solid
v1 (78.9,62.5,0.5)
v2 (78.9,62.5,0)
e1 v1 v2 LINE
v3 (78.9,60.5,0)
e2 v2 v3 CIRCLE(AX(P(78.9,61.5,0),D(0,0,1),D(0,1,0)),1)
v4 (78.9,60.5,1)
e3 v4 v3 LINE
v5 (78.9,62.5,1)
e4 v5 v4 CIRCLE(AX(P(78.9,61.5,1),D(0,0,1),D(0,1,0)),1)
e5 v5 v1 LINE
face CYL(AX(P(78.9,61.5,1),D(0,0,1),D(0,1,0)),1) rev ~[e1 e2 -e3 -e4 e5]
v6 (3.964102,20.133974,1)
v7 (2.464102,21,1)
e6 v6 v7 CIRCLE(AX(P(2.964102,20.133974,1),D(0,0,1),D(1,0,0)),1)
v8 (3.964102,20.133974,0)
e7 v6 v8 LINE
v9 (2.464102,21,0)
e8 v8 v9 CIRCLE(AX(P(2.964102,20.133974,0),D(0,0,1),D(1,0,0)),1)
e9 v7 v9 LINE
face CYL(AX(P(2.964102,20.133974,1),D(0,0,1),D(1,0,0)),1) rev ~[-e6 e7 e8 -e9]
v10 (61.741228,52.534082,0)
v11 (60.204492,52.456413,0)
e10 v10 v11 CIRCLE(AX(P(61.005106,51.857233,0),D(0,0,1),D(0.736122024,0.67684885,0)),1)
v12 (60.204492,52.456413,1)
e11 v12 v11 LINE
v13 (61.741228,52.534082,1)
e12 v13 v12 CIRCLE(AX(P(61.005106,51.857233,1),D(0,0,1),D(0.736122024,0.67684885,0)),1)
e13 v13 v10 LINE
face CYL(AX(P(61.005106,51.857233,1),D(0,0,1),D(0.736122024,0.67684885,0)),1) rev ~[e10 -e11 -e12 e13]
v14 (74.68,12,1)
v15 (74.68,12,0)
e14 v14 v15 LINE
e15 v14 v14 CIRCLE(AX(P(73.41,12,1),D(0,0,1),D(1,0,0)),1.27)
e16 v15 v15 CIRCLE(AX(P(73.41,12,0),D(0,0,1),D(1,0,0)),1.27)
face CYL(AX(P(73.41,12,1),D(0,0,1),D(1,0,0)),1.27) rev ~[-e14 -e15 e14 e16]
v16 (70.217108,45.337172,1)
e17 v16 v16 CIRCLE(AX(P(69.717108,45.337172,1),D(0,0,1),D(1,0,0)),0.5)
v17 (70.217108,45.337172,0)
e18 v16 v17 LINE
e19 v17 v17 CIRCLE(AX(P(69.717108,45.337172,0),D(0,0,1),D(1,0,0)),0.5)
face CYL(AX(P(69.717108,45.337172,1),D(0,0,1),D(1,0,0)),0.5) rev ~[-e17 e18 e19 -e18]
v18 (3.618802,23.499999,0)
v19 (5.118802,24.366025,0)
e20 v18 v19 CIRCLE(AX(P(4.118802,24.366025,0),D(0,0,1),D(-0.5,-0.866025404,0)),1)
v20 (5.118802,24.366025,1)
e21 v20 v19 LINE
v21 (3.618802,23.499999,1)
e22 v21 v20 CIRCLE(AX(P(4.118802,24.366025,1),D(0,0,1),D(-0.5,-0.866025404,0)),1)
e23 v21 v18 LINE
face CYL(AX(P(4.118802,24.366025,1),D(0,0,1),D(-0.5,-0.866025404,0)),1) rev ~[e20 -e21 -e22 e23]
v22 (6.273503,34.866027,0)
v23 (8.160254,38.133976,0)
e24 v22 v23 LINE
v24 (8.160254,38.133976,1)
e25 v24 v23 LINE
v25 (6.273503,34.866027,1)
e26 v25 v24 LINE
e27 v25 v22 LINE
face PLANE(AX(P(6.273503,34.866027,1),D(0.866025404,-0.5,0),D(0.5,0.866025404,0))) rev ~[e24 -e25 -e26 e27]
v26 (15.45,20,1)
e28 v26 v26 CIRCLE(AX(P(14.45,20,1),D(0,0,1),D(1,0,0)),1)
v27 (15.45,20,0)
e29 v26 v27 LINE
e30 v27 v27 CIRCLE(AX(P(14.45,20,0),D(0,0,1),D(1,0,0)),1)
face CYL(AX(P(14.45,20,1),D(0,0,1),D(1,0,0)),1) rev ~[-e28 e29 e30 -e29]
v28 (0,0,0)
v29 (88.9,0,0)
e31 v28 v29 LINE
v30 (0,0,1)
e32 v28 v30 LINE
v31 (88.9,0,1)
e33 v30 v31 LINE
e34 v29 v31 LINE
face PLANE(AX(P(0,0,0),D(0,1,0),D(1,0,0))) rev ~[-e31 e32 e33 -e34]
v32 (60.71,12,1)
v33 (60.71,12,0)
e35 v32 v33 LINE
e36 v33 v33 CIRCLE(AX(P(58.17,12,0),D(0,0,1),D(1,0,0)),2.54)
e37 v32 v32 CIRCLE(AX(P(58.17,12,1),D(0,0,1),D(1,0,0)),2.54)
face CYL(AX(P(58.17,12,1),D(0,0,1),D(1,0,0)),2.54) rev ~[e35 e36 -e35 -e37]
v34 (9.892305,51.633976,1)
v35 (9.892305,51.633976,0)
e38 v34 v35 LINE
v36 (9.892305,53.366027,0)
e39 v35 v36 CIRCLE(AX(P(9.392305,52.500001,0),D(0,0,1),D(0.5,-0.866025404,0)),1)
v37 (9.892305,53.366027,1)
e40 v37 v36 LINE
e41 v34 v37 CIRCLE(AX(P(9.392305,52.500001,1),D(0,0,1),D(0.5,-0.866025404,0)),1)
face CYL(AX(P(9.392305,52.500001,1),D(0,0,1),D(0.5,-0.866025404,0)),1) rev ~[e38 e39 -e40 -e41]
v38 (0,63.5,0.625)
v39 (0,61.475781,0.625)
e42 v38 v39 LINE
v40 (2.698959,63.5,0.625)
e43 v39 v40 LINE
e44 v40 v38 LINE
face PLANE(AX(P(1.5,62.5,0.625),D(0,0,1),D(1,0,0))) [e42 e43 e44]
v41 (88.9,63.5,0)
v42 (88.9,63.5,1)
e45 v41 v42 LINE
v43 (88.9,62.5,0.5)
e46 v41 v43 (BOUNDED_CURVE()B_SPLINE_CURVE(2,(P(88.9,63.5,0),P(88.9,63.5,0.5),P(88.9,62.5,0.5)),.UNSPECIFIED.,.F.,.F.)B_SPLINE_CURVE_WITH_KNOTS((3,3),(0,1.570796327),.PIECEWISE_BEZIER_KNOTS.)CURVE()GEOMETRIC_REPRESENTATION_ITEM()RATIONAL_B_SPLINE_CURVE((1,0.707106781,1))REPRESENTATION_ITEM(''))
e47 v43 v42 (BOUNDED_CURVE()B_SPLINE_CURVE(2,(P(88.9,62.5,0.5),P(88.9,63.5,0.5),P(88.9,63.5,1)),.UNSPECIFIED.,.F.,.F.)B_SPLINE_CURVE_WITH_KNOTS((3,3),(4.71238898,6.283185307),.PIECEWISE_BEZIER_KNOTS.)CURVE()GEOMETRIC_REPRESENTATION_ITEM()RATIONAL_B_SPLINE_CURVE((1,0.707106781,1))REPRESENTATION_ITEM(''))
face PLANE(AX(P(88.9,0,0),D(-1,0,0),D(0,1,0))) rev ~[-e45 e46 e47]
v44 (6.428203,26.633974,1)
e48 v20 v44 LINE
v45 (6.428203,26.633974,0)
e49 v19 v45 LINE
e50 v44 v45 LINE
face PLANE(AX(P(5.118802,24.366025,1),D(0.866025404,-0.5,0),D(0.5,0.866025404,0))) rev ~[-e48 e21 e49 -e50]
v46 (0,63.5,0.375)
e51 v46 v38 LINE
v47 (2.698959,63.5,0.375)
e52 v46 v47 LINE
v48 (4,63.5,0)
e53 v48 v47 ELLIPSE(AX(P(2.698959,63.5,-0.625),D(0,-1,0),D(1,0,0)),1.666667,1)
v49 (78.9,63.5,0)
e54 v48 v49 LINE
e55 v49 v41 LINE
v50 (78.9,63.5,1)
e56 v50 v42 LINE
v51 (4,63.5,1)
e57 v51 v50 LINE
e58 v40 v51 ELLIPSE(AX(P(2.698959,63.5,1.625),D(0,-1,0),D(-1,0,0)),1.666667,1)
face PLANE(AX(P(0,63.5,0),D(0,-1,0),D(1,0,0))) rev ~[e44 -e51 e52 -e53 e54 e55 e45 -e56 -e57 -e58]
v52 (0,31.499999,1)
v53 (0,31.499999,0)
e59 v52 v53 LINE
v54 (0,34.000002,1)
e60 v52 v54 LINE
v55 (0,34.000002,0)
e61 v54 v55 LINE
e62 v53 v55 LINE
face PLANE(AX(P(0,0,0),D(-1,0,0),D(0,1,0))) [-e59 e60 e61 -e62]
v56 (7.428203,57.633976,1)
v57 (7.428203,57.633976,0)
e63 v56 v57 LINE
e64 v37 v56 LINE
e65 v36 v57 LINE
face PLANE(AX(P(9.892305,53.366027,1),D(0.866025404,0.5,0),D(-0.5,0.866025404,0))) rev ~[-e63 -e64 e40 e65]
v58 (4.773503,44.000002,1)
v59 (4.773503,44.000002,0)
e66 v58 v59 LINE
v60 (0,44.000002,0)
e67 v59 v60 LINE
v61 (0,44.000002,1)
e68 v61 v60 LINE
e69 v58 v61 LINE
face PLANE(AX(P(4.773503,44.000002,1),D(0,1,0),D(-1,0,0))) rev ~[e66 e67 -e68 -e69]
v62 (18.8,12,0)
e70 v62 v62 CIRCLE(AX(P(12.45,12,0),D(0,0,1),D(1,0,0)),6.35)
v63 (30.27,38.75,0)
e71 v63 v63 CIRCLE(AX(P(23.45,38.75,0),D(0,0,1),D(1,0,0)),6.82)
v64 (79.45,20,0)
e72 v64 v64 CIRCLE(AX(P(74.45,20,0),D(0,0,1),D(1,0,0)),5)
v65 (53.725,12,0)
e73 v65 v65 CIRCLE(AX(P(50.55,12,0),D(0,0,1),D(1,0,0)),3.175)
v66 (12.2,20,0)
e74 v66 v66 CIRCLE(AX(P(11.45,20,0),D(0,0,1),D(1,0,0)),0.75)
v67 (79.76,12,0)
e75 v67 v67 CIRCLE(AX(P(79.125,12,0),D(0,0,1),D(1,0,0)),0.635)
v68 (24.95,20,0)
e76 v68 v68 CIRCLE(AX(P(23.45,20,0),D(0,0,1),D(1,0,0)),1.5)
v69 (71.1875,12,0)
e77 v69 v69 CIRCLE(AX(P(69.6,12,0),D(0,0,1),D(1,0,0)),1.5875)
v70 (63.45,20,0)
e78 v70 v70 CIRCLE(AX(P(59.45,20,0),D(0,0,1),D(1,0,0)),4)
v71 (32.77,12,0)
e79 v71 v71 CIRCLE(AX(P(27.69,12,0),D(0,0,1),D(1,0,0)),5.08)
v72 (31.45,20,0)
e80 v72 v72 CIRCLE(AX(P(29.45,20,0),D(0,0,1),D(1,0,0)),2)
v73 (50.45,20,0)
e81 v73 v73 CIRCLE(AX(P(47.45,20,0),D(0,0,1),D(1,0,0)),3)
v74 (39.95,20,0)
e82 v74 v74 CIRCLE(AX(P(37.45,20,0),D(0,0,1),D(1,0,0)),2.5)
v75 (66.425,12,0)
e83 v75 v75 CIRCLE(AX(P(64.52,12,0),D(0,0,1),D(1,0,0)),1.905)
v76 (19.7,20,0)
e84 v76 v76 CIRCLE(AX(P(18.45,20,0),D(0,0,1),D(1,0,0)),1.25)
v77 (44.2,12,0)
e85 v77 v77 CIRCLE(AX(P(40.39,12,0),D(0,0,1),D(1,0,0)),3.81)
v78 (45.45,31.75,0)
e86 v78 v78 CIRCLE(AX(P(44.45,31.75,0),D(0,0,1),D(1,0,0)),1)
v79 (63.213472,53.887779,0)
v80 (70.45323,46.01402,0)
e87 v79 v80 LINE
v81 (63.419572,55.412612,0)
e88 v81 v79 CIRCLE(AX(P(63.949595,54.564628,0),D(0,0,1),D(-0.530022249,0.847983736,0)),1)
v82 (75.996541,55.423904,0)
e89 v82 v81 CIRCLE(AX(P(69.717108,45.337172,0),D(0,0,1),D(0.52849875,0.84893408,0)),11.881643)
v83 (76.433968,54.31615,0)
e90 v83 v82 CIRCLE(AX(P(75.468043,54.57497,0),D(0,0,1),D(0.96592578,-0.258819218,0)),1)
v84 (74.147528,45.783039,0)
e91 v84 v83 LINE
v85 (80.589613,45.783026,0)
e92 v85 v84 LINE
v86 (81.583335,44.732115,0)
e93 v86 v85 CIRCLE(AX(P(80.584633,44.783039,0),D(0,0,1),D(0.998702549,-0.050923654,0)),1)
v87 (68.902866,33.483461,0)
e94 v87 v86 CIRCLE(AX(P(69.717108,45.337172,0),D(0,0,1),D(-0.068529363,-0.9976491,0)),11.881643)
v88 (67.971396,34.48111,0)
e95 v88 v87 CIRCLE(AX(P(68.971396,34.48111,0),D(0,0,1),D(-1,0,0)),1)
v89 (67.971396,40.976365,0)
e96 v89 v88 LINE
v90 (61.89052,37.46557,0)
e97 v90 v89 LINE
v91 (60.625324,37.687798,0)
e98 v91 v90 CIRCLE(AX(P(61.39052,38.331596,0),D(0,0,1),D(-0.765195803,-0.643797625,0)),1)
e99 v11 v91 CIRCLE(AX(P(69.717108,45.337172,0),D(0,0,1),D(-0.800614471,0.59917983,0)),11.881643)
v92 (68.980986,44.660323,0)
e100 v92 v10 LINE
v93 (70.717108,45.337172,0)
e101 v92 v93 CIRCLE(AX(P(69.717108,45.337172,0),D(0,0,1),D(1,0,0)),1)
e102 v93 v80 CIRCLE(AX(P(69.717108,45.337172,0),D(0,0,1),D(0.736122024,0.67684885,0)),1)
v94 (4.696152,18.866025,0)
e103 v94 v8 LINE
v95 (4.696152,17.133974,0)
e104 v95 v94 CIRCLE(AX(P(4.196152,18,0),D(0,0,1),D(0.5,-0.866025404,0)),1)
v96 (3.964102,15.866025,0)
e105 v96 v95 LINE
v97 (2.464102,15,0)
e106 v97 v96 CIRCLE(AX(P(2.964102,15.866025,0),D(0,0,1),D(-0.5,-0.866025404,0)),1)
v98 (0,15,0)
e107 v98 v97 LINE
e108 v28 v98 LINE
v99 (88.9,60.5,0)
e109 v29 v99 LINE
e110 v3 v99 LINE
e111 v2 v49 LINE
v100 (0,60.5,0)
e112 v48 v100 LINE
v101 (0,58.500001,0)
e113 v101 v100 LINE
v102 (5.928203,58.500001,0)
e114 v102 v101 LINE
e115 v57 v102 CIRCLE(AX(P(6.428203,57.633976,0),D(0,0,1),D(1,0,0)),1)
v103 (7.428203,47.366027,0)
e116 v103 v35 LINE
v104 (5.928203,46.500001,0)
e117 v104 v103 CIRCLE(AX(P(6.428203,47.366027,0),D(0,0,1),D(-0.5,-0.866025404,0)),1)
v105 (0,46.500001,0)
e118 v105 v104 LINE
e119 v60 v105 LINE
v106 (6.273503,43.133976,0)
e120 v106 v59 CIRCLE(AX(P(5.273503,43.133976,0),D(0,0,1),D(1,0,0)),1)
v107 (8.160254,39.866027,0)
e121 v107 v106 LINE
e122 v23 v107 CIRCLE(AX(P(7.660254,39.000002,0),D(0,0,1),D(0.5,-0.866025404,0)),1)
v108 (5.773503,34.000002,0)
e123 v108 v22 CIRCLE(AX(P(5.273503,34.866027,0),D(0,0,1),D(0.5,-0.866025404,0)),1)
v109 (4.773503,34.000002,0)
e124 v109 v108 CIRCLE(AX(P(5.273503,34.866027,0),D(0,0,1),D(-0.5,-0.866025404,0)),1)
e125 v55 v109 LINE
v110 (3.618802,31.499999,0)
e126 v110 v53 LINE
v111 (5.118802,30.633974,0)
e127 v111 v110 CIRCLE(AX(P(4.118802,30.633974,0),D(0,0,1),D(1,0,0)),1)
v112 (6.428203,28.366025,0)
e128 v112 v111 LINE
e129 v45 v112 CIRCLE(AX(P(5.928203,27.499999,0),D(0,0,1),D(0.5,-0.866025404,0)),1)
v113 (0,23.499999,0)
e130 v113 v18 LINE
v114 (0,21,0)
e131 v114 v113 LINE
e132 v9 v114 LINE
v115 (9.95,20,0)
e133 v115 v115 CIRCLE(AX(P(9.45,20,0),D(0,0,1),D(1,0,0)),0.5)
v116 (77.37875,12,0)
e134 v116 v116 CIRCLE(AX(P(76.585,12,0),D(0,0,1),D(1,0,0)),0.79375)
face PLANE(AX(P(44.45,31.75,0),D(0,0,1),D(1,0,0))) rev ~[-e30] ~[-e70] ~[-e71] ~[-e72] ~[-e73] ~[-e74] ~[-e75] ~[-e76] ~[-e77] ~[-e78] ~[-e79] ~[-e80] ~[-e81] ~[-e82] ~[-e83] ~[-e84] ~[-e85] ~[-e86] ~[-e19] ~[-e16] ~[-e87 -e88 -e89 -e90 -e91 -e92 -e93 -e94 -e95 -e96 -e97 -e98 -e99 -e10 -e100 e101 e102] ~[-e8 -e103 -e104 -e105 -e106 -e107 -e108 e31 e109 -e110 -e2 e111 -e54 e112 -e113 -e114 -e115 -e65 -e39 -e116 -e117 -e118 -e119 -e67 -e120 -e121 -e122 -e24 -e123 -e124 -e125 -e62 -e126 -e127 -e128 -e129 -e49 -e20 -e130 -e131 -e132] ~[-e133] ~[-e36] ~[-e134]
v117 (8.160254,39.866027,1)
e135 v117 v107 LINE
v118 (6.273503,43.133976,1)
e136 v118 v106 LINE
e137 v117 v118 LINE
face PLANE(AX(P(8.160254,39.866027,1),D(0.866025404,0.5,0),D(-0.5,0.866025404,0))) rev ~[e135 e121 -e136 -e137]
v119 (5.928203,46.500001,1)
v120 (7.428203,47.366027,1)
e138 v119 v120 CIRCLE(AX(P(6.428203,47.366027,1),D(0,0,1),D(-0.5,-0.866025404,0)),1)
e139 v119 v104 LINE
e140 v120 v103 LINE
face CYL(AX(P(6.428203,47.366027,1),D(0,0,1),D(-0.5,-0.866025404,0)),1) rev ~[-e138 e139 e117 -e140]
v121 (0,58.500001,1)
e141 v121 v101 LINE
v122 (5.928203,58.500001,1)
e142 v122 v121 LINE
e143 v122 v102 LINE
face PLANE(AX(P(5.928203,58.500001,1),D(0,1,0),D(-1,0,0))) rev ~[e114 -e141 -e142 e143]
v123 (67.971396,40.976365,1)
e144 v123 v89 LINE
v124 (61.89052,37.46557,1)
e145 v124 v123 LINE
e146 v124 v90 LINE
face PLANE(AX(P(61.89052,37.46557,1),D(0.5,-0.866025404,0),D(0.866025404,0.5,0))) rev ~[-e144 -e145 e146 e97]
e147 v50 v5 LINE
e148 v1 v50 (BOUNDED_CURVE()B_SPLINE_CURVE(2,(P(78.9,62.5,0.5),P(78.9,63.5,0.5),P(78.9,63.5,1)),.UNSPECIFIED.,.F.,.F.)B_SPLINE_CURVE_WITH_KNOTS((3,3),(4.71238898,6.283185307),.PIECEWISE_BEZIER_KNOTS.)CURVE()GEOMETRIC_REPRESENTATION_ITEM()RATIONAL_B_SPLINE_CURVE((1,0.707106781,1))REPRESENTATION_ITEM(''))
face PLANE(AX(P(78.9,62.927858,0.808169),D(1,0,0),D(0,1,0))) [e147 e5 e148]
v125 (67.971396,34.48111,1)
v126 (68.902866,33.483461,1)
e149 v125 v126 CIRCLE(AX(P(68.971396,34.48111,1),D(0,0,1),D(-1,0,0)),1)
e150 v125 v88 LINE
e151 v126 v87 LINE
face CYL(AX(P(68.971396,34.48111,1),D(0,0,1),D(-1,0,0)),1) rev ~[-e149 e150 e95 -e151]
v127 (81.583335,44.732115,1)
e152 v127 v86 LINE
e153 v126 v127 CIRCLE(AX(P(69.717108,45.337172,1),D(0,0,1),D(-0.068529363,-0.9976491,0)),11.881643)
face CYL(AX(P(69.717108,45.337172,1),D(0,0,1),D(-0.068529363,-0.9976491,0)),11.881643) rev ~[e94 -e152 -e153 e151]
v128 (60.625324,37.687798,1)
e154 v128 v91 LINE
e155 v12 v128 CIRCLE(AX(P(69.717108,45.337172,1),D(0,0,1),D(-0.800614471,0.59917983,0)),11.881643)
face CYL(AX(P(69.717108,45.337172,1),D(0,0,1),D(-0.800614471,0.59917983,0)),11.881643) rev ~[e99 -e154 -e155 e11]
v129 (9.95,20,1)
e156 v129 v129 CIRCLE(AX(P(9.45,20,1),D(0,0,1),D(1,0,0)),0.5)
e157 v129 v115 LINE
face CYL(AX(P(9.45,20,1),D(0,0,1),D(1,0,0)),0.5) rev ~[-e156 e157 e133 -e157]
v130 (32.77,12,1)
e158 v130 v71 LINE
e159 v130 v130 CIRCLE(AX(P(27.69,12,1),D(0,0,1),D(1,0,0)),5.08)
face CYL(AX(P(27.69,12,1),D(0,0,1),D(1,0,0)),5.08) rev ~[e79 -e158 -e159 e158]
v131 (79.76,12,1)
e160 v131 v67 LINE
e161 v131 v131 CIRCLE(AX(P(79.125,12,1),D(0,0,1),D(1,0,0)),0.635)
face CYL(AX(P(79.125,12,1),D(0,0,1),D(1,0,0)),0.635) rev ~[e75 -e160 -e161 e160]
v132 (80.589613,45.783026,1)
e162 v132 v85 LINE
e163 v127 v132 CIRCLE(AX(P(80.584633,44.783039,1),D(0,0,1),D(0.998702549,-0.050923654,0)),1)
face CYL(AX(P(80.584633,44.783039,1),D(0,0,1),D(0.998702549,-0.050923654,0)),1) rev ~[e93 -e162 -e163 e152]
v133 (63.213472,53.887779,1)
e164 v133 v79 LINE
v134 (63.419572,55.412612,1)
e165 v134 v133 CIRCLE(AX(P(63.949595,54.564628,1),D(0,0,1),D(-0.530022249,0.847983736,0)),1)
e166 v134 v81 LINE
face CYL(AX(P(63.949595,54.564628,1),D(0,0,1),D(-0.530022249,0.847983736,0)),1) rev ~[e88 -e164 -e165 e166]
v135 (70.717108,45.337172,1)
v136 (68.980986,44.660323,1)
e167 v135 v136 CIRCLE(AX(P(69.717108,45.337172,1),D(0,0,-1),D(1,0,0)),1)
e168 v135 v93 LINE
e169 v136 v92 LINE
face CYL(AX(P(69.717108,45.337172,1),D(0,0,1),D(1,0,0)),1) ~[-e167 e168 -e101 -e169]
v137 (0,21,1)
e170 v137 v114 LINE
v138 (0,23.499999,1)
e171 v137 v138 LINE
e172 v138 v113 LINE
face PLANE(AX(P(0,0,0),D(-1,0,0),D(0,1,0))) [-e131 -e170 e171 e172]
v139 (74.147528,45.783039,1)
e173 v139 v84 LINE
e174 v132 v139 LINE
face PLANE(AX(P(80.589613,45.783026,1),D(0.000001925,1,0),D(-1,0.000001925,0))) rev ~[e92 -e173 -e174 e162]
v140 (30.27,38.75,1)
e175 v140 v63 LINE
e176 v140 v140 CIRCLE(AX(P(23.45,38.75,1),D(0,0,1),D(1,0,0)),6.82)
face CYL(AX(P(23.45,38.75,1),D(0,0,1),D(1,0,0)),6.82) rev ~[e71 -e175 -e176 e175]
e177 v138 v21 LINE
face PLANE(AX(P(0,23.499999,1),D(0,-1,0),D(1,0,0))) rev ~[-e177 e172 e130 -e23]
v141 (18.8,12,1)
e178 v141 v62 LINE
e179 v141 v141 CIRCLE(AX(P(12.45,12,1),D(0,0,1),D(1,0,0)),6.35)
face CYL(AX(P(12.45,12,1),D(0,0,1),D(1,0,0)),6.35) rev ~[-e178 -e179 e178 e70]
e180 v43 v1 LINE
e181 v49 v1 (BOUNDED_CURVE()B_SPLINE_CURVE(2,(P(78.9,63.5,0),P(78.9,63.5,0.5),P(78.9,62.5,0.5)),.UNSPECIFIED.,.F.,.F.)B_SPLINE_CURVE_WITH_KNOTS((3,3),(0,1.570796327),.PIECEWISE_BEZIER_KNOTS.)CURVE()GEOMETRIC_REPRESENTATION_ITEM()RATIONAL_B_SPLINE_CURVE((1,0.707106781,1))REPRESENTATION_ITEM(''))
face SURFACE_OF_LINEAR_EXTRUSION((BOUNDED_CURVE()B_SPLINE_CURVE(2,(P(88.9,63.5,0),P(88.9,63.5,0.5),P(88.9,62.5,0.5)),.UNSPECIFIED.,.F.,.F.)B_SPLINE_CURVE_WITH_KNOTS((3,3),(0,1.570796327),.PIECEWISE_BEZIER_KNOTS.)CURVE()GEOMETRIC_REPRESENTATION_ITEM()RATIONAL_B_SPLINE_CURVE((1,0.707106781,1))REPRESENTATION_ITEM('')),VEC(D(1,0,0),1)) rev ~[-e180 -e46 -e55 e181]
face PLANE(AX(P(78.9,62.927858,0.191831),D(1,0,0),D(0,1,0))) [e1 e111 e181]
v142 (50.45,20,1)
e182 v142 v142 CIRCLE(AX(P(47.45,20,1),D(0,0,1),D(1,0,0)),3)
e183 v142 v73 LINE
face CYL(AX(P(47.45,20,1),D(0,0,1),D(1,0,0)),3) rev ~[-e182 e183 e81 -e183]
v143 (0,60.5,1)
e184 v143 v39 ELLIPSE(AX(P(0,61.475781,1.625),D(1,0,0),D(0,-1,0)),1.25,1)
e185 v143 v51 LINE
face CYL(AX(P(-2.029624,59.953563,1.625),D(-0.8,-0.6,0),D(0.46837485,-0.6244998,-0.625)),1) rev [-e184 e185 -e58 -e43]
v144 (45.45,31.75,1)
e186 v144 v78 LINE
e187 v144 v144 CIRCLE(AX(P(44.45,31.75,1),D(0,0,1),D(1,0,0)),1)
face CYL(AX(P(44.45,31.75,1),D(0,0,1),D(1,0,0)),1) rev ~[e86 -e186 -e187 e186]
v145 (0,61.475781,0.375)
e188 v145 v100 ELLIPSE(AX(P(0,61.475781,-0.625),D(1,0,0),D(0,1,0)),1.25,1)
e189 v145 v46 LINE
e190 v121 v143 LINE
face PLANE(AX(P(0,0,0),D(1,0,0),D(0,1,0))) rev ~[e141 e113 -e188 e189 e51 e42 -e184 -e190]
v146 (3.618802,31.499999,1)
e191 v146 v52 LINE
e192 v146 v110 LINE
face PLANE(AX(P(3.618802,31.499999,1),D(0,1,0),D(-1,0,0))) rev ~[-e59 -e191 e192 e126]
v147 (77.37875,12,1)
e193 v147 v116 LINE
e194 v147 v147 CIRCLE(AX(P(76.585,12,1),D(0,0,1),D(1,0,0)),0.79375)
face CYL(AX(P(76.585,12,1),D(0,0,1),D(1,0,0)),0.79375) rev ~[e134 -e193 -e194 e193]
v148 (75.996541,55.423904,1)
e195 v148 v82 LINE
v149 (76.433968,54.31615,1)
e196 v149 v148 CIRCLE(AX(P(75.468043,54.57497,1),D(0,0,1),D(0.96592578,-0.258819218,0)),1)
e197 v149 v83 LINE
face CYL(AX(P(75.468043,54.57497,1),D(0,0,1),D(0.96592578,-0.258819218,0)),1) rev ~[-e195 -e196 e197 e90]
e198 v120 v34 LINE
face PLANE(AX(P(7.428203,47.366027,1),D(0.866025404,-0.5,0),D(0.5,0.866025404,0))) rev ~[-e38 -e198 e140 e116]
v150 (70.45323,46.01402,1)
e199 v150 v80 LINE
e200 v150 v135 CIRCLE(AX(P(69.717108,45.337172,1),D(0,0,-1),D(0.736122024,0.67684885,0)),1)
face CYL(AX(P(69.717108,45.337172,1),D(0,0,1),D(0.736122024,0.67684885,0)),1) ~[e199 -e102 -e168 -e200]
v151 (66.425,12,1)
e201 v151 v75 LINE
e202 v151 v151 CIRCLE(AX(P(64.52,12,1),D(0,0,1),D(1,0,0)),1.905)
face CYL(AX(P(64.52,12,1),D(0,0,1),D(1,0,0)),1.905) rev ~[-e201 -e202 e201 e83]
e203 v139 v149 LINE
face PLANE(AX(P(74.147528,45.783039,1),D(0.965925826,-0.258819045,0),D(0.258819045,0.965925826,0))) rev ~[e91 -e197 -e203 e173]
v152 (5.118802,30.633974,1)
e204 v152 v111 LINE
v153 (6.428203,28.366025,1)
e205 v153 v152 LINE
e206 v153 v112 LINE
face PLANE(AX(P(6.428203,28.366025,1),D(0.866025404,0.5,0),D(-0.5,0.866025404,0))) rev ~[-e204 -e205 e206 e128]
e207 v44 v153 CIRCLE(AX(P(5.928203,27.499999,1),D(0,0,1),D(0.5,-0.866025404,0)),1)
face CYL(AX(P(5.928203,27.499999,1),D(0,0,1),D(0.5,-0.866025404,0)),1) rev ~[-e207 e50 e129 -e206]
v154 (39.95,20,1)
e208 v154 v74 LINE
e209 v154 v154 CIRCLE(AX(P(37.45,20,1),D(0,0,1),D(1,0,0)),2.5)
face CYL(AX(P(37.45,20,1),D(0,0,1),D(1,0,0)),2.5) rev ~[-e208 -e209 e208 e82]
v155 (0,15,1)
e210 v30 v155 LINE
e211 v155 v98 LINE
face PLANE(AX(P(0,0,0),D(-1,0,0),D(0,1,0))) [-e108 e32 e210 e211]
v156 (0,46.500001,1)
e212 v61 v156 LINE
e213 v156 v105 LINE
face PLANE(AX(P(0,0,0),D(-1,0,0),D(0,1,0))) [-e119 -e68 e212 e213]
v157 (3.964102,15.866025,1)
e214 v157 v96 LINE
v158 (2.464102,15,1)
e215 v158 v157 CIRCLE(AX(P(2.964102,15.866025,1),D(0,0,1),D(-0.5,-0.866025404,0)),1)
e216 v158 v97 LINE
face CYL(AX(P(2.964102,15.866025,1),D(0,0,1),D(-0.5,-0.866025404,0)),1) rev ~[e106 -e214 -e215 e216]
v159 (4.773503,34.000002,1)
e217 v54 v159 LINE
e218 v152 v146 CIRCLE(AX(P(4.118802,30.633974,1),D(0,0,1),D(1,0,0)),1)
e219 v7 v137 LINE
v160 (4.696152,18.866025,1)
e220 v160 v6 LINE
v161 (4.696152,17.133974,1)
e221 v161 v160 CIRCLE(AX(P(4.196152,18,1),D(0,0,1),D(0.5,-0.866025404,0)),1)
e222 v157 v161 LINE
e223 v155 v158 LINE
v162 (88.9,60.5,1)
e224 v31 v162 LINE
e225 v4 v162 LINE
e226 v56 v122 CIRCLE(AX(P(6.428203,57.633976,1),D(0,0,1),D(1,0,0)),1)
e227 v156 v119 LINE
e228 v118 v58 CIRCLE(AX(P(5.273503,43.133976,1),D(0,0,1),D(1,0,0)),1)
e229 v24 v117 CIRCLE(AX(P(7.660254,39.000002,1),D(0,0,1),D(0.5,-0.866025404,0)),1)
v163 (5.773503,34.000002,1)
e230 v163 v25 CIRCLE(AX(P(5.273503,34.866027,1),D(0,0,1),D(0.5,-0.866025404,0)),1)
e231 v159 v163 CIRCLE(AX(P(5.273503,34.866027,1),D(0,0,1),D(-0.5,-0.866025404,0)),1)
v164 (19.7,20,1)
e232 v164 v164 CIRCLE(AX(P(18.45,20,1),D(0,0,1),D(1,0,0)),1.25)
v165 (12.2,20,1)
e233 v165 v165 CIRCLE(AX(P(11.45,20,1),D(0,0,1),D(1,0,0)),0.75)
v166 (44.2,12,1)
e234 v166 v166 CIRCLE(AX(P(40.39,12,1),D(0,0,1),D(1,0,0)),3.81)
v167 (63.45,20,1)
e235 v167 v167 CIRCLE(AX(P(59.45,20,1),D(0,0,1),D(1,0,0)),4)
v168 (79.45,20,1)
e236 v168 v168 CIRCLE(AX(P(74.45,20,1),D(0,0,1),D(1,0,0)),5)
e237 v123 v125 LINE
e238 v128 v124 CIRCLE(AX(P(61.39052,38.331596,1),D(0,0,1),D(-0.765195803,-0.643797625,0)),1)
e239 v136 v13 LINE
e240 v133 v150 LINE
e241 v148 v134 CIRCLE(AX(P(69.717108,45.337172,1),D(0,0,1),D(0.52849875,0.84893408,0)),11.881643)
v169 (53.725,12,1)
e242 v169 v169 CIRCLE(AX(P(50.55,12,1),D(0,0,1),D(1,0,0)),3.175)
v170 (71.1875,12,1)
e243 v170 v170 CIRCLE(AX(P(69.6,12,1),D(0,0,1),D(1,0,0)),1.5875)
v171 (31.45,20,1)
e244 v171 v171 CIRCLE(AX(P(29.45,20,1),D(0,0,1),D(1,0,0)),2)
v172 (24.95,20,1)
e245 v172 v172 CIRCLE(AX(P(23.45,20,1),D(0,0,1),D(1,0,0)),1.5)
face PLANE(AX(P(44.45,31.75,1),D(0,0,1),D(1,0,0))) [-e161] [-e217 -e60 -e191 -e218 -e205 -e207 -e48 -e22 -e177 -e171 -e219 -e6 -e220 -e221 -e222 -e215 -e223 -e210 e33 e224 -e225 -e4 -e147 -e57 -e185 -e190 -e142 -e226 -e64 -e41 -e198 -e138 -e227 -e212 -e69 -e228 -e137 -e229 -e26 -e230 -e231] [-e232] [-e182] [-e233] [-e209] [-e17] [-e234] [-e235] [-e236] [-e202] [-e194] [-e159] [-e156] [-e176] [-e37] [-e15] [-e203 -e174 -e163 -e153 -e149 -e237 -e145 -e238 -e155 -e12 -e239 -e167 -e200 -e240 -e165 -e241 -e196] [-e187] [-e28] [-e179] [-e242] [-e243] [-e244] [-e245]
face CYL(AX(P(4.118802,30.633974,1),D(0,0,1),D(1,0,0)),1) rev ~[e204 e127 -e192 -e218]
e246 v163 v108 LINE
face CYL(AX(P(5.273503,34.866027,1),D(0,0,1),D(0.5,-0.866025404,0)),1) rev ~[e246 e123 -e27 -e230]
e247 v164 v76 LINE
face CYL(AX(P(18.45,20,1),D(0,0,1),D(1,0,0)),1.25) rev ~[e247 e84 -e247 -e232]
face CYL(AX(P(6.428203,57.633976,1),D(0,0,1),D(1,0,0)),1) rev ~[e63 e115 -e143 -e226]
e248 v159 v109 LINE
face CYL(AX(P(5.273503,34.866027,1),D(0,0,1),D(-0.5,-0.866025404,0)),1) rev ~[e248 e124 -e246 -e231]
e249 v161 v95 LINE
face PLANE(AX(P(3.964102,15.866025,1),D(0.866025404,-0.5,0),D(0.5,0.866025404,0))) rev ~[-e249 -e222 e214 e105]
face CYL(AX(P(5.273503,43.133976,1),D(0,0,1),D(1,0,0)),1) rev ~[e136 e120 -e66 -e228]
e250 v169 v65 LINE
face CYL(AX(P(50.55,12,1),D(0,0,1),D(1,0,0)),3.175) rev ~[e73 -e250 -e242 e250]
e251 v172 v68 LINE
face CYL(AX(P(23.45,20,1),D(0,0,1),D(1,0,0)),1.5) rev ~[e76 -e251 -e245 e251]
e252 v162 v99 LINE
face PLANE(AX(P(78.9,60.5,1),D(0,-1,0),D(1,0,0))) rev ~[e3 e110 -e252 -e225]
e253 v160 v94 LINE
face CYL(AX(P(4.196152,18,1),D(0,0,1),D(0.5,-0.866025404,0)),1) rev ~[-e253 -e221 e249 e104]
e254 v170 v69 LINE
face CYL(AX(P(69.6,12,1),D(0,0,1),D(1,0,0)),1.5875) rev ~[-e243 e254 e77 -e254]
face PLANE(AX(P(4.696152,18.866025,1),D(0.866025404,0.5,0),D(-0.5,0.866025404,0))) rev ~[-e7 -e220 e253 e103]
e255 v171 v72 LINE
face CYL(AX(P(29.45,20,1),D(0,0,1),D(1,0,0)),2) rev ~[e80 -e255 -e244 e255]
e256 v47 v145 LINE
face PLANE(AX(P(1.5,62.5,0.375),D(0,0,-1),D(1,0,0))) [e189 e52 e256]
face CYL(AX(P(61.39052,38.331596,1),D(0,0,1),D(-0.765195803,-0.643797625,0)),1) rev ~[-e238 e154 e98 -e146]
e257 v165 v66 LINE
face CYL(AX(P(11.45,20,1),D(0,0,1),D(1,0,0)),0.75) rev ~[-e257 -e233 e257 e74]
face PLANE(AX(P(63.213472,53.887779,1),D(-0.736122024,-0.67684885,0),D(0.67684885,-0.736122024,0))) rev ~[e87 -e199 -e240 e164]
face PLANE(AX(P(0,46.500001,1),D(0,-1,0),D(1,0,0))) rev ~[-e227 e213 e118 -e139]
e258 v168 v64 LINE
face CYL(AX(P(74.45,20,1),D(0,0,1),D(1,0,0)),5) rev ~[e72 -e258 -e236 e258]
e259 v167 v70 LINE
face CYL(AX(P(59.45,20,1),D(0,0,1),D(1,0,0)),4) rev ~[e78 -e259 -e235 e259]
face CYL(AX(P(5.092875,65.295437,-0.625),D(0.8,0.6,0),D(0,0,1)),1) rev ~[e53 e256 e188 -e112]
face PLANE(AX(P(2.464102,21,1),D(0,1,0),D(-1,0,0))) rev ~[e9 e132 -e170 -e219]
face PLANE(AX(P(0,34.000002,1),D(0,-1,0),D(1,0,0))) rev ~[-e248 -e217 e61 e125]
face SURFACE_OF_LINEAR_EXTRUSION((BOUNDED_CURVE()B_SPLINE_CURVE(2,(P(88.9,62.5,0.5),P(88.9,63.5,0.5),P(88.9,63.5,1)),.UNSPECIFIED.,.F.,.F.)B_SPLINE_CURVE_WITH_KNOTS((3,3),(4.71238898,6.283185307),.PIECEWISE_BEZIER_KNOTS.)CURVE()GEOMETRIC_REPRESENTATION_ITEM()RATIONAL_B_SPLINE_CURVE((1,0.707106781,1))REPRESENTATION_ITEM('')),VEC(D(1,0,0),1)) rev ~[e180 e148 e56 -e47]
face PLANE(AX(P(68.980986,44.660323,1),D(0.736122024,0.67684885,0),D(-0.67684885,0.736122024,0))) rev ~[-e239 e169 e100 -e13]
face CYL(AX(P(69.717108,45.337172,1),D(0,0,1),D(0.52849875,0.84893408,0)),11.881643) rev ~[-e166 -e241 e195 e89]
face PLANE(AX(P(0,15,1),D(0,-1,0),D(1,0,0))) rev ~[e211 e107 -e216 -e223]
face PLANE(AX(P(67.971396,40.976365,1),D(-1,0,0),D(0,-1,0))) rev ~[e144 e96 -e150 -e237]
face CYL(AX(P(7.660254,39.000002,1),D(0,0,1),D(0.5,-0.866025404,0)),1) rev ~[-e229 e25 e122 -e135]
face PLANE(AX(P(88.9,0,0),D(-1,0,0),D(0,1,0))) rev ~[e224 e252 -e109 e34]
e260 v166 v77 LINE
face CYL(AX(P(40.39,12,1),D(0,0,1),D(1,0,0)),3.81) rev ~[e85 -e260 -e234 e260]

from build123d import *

# Parameters (mm, degrees)
F0_W          = 88.9
F0_H          = 63.5
F1_DEPTH      = 1
F5_DEPTH      = 25
F7_DEPTH      = 10
F8_R          = 5
F8_R_2        = 6.35
F8_R_3        = 5.08
F8_R_4        = 3.81
F8_R_5        = 3.175
F8_R_6        = 2.54
F8_R_7        = 1.905
F8_R_8        = 1.5875
F8_R_9        = 1.27
F8_R_10       = 0.79375
F8_R_11       = 0.635
F8_R_12       = 4
F8_R_13       = 3
F8_R_14       = 2.5
F8_R_15       = 2
F8_R_16       = 1.5
F8_R_17       = 1.25
F8_R_18       = 1
F8_R_19       = 0.75
F8_R_20       = 0.5
F8_R_21       = 6.82
F9_DEPTH      = 25
F11_DEPTH     = 0.375
F13_DEPTH     = 0.375
F14_T4_DEPTH  = 8.903123749
F14_T10_DEPTH = 8.903123749


# Not quite as in the source:
# - a fillet or chamfer that OpenCascade refuses, or shapes differently, is made with other operations: its cross-section is extruded or revolved along the edge and cut away or added
# - ends of sketch curves that miss each other by under 0.0002 mm in the source are joined


with BuildPart() as f1:
    # F0 (on Top) → F1 (new body)
    with BuildSketch(Plane.XY):
        with Locations((44.45, 31.75)):
            Rectangle(F0_W, F0_H)
    extrude(amount=F1_DEPTH)

    # F4 (on face) → F5 (cut)
    with BuildSketch(Plane.XY.offset(1)):
        with BuildLine():
            Line((78.9, 60.5), (88.9, 60.5))
            Line((88.9, 60.5), (88.9, 62.5))
            Line((88.9, 62.5), (78.9, 62.5))
            ThreePointArc((78.9, 62.5), (79.6071067812, 62.2071067812), (79.9, 61.5))
            ThreePointArc((79.9, 61.5), (79.6071067812, 60.7928932188), (78.9, 60.5))
        make_face()
        with BuildLine():
            ThreePointArc((78.9, 62.5), (77.9, 61.5), (78.9, 60.5))
            Line((78.9, 60.5), (78.9, 62.5))
        make_face()
        with BuildLine():
            Line((78.9, 62.5), (78.9, 60.5))
            ThreePointArc((78.9, 60.5), (79.6071067812, 60.7928932188), (79.9, 61.5))
            ThreePointArc((79.9, 61.5), (79.6071067812, 62.2071067812), (78.9, 62.5))
        make_face()
    extrude(amount=-F5_DEPTH, mode=Mode.SUBTRACT)

    # F6 (on face) → F7 (cut)
    with BuildSketch(Plane.YZ.offset(88.9)):
        with BuildLine():
            add(Edge.make_bspline(
                [(63.5, 0), (63.5, 0.5), (62.5, 0.5)],
                knots=[0, 0, 0, 1.5707963268, 1.5707963268, 1.5707963268], degree=2, weights=[1, 0.7071067812, 1]))
            Line((62.5, 0.5), (62.5, 0))
            Line((62.5, 0), (63.5, 0))
        make_face()
        with BuildLine():
            Line((63.5, 1), (62.5, 1))
            Line((62.5, 1), (62.5, 0.5))
            add(Edge.make_bspline(
                [(62.5, 0.5), (63.5, 0.5), (63.5, 1)],
                knots=[4.7123889804, 4.7123889804, 4.7123889804, 6.2831853072, 6.2831853072, 6.2831853072], degree=2, weights=[1, 0.7071067812, 1]))
        make_face()
    extrude(amount=-F7_DEPTH, mode=Mode.SUBTRACT)

    # F8 (on face) → F9 (cut)
    with BuildSketch(Plane.XY.offset(1)):
        with Locations((74.45, 20)):
            Circle(F8_R)
        with Locations((12.45, 12)):
            Circle(F8_R_2)
        with Locations((27.69, 12)):
            Circle(F8_R_3)
        with Locations((40.39, 12)):
            Circle(F8_R_4)
        with Locations((50.55, 12)):
            Circle(F8_R_5)
        with Locations((58.17, 12)):
            Circle(F8_R_6)
        with Locations((64.52, 12)):
            Circle(F8_R_7)
        with Locations((69.6, 12)):
            Circle(F8_R_8)
        with Locations((73.41, 12)):
            Circle(F8_R_9)
        with Locations((76.585, 12)):
            Circle(F8_R_10)
        with Locations((79.125, 12)):
            Circle(F8_R_11)
        with Locations((59.45, 20)):
            Circle(F8_R_12)
        with Locations((47.45, 20)):
            Circle(F8_R_13)
        with Locations((37.45, 20)):
            Circle(F8_R_14)
        with Locations((29.45, 20)):
            Circle(F8_R_15)
        with Locations((23.45, 20)):
            Circle(F8_R_16)
        with Locations((18.45, 20)):
            Circle(F8_R_17)
        with Locations((14.45, 20)):
            Circle(F8_R_18)
        with Locations((11.45, 20)):
            Circle(F8_R_19)
        with Locations((9.45, 20)):
            Circle(F8_R_20)
        with BuildLine():
            Line((0, 14.9999996647), (2.4641016151, 14.9999996647))
            ThreePointArc((2.4641016151, 14.9999996647), (3.4641016151, 14.9999996647), (3.9641016151, 15.8660250685))
            Line((3.9641016151, 15.8660250685), (4.6961524227, 17.1339742609))
            ThreePointArc((4.6961524227, 17.1339742609), (5.1961524227, 17.9999996647), (4.6961524227, 18.8660250685))
            Line((4.6961524227, 18.8660250685), (3.9641016151, 20.1339742609))
            ThreePointArc((3.9641016151, 20.1339742609), (3.4641016151, 20.9999996647), (2.4641016151, 20.9999996647))
            Line((2.4641016151, 20.9999996647), (0, 20.9999996647))
            Line((0, 20.9999996647), (-1.7320508076, 17.9999996647))
            Line((-1.7320508076, 17.9999996647), (0, 14.9999996647))
        make_face()
        with BuildLine():
            Line((-2.8867513459, 39.0000018477), (0, 34.0000018477))
            Line((0, 34.0000018477), (4.7735026919, 34.0000018477))
            ThreePointArc((4.7735026919, 34.0000018477), (5.2735026919, 33.8660272515), (5.7735026919, 34.0000018477))
            ThreePointArc((5.7735026919, 34.0000018477), (6.1395280957, 34.3660272515), (6.2735026919, 34.8660272515))
            Line((6.2735026919, 34.8660272515), (8.1602540378, 38.133976444))
            ThreePointArc((8.1602540378, 38.133976444), (8.6602540378, 39.0000018477), (8.1602540378, 39.8660272515))
            Line((8.1602540378, 39.8660272515), (6.2735026919, 43.133976444))
            ThreePointArc((6.2735026919, 43.133976444), (5.7735026919, 44.0000018477), (4.7735026919, 44.0000018477))
            Line((4.7735026919, 44.0000018477), (0, 44.0000018477))
            Line((0, 44.0000018477), (-2.8867513459, 39.0000018477))
        make_face()
        with BuildLine():
            Line((0, 23.4999991953), (3.6188021535, 23.4999991953))
            ThreePointArc((3.6188021535, 23.4999991953), (4.6188021535, 23.4999991953), (5.1188021535, 24.3660245991))
            Line((5.1188021535, 24.3660245991), (6.4282032303, 26.6339737916))
            ThreePointArc((6.4282032303, 26.6339737916), (6.9282032303, 27.4999991953), (6.4282032303, 28.3660245991))
            Line((6.4282032303, 28.3660245991), (5.1188021535, 30.6339737916))
            ThreePointArc((5.1188021535, 30.6339737916), (4.6188021535, 31.4999991953), (3.6188021535, 31.4999991953))
            Line((3.6188021535, 31.4999991953), (0, 31.4999991953))
            Line((0, 31.4999991953), (-2.3094010768, 27.4999991953))
            Line((-2.3094010768, 27.4999991953), (0, 23.4999991953))
        make_face()
        with BuildLine():
            Line((0, 46.5000011027), (5.9282032303, 46.5000011027))
            ThreePointArc((5.9282032303, 46.5000011027), (6.9282032303, 46.5000011027), (7.4282032303, 47.3660265065))
            Line((7.4282032303, 47.3660265065), (9.8923048454, 51.6339756989))
            ThreePointArc((9.8923048454, 51.6339756989), (10.3923048454, 52.5000011027), (9.8923048454, 53.3660265065))
            Line((9.8923048454, 53.3660265065), (7.4282032303, 57.6339756989))
            ThreePointArc((7.4282032303, 57.6339756989), (6.9282032303, 58.5000011027), (5.9282032303, 58.5000011027))
            Line((5.9282032303, 58.5000011027), (0, 58.5000011027))
            Line((0, 58.5000011027), (-3.4641016151, 52.5000011027))
            Line((-3.4641016151, 52.5000011027), (0, 46.5000011027))
        make_face()
        with BuildLine():
            ThreePointArc((75.9965413819, 55.4239037183), (69.7064402802, 57.2188103383), (63.4195722631, 55.4126120713))
            ThreePointArc((63.4195722631, 55.4126120713), (62.9586056452, 54.6985726023), (63.2134724878, 53.8877794854))
            Line((63.2134724878, 53.8877794854), (70.453229681, 46.0140204974))
            ThreePointArc((70.453229681, 46.0140204974), (70.6488055759, 45.7004057151), (70.7171076571, 45.3371716473))
            ThreePointArc((70.7171076571, 45.3371716473), (70.080341725, 44.4054737284), (68.9809856332, 44.6603227971))
            Line((68.9809856332, 44.6603227971), (61.74122844, 52.5340817851))
            ThreePointArc((61.74122844, 52.5340817851), (60.9546293112, 52.8559581533), (60.2044919449, 52.4564127647))
            ThreePointArc((60.2044919449, 52.4564127647), (57.8402849867, 44.9987414015), (60.6253238546, 37.6877978778))
            ThreePointArc((60.6253238546, 37.6877978778), (61.2175210997, 37.3466734256), (61.8905196516, 37.4655700956))
            Line((61.8905196516, 37.4655700956), (67.9713955599, 40.9763654382))
            Line((67.9713955599, 40.9763654382), (67.9713955599, 34.4811098251))
            ThreePointArc((67.9713955599, 34.4811098251), (68.2404614442, 33.7986617916), (68.9028661968, 33.4834607253))
            ThreePointArc((68.9028661968, 33.4834607253), (77.6018812733, 36.4487636459), (81.5833352867, 44.7321149393))
            ThreePointArc((81.5833352867, 44.7321149393), (81.3112334204, 45.4700985969), (80.5896132811, 45.7830261909))
            Line((80.5896132811, 45.7830261909), (74.1475280684, 45.7830385939))
            Line((74.1475280684, 45.7830385939), (76.4339684801, 54.3161503788))
            ThreePointArc((76.4339684801, 54.3161503788), (76.3981531684, 54.9422494851), (75.9965413819, 55.4239037183))
        make_face()
        with Locations((69.7171076571, 45.3371716473)):
            Circle(F8_R_20)
        with Locations((23.45, 38.750000298)):
            Circle(F8_R_21)
        with Locations((44.45, 31.75)):
            Circle(F8_R_18)
    extrude(amount=-F9_DEPTH, mode=Mode.SUBTRACT)

    # F10 (on face) → F11 (cut)
    with BuildSketch(Plane.XY.offset(1)):
        Polygon((0, 63.5), (0, 60.5), (4, 63.5), align=None)
    extrude(amount=-F11_DEPTH, mode=Mode.SUBTRACT)

    # F12 (on face) → F13 (cut)
    with BuildSketch(Plane(origin=(0, 0, 0), x_dir=(1, 0, 0), z_dir=(0, 0, -1))):
        Polygon((4, -63.5), (0, -60.5), (0, -63.5), align=None)
    extrude(amount=-F13_DEPTH, mode=Mode.SUBTRACT)

    # F14: fillet of radius 1 on 2 edges, made by hand


with BuildPart() as f14_tool2:
    # F14_s3 → F14_t4 (new body)
    with BuildSketch(Plane(origin=(27.4787505004, 20.6090628753, 0), x_dir=(0, 0, 1), z_dir=(0.8, 0.6, 0))):
        with BuildLine():
            ThreePointArc((1, -48.4), (0.7236121811, -48.7476120479), (0.625, -49.1806247498))
            Line((0.625, -49.1806247498), (0.625, -48.4))
            Line((0.625, -48.4), (1, -48.4))
        make_face()
    extrude(amount=F14_T4_DEPTH)

    split(bisect_by=Plane.YZ, keep=Keep.TOP)

    split(bisect_by=Plane.XZ.offset(-63.5), keep=Keep.TOP)


with BuildPart() as f1_1:
    add(f1.part)

    # F14_t1: union F14_tool2
    add(f14_tool2.part)


with BuildPart() as f14_tool8:
    # F14_s9 → F14_t10 (new body)
    with BuildSketch(Plane(origin=(34.6012494996, 25.9509371247, 0), x_dir=(0, 0, 1), z_dir=(-0.8, -0.6, 0))):
        with BuildLine():
            ThreePointArc((0.375, 49.1806247498), (0.2763878189, 48.7476120479), (0, 48.4))
            Line((0, 48.4), (0.375, 48.4))
            Line((0.375, 48.4), (0.375, 49.1806247498))
        make_face()
    extrude(amount=F14_T10_DEPTH)

    split(bisect_by=Plane.YZ, keep=Keep.TOP)

    split(bisect_by=Plane.XZ.offset(-63.5), keep=Keep.TOP)


with BuildPart() as f1_2:
    add(f1_1.part)

    # F14_t7: union F14_tool8
    add(f14_tool8.part)


solid = f1_2.part
